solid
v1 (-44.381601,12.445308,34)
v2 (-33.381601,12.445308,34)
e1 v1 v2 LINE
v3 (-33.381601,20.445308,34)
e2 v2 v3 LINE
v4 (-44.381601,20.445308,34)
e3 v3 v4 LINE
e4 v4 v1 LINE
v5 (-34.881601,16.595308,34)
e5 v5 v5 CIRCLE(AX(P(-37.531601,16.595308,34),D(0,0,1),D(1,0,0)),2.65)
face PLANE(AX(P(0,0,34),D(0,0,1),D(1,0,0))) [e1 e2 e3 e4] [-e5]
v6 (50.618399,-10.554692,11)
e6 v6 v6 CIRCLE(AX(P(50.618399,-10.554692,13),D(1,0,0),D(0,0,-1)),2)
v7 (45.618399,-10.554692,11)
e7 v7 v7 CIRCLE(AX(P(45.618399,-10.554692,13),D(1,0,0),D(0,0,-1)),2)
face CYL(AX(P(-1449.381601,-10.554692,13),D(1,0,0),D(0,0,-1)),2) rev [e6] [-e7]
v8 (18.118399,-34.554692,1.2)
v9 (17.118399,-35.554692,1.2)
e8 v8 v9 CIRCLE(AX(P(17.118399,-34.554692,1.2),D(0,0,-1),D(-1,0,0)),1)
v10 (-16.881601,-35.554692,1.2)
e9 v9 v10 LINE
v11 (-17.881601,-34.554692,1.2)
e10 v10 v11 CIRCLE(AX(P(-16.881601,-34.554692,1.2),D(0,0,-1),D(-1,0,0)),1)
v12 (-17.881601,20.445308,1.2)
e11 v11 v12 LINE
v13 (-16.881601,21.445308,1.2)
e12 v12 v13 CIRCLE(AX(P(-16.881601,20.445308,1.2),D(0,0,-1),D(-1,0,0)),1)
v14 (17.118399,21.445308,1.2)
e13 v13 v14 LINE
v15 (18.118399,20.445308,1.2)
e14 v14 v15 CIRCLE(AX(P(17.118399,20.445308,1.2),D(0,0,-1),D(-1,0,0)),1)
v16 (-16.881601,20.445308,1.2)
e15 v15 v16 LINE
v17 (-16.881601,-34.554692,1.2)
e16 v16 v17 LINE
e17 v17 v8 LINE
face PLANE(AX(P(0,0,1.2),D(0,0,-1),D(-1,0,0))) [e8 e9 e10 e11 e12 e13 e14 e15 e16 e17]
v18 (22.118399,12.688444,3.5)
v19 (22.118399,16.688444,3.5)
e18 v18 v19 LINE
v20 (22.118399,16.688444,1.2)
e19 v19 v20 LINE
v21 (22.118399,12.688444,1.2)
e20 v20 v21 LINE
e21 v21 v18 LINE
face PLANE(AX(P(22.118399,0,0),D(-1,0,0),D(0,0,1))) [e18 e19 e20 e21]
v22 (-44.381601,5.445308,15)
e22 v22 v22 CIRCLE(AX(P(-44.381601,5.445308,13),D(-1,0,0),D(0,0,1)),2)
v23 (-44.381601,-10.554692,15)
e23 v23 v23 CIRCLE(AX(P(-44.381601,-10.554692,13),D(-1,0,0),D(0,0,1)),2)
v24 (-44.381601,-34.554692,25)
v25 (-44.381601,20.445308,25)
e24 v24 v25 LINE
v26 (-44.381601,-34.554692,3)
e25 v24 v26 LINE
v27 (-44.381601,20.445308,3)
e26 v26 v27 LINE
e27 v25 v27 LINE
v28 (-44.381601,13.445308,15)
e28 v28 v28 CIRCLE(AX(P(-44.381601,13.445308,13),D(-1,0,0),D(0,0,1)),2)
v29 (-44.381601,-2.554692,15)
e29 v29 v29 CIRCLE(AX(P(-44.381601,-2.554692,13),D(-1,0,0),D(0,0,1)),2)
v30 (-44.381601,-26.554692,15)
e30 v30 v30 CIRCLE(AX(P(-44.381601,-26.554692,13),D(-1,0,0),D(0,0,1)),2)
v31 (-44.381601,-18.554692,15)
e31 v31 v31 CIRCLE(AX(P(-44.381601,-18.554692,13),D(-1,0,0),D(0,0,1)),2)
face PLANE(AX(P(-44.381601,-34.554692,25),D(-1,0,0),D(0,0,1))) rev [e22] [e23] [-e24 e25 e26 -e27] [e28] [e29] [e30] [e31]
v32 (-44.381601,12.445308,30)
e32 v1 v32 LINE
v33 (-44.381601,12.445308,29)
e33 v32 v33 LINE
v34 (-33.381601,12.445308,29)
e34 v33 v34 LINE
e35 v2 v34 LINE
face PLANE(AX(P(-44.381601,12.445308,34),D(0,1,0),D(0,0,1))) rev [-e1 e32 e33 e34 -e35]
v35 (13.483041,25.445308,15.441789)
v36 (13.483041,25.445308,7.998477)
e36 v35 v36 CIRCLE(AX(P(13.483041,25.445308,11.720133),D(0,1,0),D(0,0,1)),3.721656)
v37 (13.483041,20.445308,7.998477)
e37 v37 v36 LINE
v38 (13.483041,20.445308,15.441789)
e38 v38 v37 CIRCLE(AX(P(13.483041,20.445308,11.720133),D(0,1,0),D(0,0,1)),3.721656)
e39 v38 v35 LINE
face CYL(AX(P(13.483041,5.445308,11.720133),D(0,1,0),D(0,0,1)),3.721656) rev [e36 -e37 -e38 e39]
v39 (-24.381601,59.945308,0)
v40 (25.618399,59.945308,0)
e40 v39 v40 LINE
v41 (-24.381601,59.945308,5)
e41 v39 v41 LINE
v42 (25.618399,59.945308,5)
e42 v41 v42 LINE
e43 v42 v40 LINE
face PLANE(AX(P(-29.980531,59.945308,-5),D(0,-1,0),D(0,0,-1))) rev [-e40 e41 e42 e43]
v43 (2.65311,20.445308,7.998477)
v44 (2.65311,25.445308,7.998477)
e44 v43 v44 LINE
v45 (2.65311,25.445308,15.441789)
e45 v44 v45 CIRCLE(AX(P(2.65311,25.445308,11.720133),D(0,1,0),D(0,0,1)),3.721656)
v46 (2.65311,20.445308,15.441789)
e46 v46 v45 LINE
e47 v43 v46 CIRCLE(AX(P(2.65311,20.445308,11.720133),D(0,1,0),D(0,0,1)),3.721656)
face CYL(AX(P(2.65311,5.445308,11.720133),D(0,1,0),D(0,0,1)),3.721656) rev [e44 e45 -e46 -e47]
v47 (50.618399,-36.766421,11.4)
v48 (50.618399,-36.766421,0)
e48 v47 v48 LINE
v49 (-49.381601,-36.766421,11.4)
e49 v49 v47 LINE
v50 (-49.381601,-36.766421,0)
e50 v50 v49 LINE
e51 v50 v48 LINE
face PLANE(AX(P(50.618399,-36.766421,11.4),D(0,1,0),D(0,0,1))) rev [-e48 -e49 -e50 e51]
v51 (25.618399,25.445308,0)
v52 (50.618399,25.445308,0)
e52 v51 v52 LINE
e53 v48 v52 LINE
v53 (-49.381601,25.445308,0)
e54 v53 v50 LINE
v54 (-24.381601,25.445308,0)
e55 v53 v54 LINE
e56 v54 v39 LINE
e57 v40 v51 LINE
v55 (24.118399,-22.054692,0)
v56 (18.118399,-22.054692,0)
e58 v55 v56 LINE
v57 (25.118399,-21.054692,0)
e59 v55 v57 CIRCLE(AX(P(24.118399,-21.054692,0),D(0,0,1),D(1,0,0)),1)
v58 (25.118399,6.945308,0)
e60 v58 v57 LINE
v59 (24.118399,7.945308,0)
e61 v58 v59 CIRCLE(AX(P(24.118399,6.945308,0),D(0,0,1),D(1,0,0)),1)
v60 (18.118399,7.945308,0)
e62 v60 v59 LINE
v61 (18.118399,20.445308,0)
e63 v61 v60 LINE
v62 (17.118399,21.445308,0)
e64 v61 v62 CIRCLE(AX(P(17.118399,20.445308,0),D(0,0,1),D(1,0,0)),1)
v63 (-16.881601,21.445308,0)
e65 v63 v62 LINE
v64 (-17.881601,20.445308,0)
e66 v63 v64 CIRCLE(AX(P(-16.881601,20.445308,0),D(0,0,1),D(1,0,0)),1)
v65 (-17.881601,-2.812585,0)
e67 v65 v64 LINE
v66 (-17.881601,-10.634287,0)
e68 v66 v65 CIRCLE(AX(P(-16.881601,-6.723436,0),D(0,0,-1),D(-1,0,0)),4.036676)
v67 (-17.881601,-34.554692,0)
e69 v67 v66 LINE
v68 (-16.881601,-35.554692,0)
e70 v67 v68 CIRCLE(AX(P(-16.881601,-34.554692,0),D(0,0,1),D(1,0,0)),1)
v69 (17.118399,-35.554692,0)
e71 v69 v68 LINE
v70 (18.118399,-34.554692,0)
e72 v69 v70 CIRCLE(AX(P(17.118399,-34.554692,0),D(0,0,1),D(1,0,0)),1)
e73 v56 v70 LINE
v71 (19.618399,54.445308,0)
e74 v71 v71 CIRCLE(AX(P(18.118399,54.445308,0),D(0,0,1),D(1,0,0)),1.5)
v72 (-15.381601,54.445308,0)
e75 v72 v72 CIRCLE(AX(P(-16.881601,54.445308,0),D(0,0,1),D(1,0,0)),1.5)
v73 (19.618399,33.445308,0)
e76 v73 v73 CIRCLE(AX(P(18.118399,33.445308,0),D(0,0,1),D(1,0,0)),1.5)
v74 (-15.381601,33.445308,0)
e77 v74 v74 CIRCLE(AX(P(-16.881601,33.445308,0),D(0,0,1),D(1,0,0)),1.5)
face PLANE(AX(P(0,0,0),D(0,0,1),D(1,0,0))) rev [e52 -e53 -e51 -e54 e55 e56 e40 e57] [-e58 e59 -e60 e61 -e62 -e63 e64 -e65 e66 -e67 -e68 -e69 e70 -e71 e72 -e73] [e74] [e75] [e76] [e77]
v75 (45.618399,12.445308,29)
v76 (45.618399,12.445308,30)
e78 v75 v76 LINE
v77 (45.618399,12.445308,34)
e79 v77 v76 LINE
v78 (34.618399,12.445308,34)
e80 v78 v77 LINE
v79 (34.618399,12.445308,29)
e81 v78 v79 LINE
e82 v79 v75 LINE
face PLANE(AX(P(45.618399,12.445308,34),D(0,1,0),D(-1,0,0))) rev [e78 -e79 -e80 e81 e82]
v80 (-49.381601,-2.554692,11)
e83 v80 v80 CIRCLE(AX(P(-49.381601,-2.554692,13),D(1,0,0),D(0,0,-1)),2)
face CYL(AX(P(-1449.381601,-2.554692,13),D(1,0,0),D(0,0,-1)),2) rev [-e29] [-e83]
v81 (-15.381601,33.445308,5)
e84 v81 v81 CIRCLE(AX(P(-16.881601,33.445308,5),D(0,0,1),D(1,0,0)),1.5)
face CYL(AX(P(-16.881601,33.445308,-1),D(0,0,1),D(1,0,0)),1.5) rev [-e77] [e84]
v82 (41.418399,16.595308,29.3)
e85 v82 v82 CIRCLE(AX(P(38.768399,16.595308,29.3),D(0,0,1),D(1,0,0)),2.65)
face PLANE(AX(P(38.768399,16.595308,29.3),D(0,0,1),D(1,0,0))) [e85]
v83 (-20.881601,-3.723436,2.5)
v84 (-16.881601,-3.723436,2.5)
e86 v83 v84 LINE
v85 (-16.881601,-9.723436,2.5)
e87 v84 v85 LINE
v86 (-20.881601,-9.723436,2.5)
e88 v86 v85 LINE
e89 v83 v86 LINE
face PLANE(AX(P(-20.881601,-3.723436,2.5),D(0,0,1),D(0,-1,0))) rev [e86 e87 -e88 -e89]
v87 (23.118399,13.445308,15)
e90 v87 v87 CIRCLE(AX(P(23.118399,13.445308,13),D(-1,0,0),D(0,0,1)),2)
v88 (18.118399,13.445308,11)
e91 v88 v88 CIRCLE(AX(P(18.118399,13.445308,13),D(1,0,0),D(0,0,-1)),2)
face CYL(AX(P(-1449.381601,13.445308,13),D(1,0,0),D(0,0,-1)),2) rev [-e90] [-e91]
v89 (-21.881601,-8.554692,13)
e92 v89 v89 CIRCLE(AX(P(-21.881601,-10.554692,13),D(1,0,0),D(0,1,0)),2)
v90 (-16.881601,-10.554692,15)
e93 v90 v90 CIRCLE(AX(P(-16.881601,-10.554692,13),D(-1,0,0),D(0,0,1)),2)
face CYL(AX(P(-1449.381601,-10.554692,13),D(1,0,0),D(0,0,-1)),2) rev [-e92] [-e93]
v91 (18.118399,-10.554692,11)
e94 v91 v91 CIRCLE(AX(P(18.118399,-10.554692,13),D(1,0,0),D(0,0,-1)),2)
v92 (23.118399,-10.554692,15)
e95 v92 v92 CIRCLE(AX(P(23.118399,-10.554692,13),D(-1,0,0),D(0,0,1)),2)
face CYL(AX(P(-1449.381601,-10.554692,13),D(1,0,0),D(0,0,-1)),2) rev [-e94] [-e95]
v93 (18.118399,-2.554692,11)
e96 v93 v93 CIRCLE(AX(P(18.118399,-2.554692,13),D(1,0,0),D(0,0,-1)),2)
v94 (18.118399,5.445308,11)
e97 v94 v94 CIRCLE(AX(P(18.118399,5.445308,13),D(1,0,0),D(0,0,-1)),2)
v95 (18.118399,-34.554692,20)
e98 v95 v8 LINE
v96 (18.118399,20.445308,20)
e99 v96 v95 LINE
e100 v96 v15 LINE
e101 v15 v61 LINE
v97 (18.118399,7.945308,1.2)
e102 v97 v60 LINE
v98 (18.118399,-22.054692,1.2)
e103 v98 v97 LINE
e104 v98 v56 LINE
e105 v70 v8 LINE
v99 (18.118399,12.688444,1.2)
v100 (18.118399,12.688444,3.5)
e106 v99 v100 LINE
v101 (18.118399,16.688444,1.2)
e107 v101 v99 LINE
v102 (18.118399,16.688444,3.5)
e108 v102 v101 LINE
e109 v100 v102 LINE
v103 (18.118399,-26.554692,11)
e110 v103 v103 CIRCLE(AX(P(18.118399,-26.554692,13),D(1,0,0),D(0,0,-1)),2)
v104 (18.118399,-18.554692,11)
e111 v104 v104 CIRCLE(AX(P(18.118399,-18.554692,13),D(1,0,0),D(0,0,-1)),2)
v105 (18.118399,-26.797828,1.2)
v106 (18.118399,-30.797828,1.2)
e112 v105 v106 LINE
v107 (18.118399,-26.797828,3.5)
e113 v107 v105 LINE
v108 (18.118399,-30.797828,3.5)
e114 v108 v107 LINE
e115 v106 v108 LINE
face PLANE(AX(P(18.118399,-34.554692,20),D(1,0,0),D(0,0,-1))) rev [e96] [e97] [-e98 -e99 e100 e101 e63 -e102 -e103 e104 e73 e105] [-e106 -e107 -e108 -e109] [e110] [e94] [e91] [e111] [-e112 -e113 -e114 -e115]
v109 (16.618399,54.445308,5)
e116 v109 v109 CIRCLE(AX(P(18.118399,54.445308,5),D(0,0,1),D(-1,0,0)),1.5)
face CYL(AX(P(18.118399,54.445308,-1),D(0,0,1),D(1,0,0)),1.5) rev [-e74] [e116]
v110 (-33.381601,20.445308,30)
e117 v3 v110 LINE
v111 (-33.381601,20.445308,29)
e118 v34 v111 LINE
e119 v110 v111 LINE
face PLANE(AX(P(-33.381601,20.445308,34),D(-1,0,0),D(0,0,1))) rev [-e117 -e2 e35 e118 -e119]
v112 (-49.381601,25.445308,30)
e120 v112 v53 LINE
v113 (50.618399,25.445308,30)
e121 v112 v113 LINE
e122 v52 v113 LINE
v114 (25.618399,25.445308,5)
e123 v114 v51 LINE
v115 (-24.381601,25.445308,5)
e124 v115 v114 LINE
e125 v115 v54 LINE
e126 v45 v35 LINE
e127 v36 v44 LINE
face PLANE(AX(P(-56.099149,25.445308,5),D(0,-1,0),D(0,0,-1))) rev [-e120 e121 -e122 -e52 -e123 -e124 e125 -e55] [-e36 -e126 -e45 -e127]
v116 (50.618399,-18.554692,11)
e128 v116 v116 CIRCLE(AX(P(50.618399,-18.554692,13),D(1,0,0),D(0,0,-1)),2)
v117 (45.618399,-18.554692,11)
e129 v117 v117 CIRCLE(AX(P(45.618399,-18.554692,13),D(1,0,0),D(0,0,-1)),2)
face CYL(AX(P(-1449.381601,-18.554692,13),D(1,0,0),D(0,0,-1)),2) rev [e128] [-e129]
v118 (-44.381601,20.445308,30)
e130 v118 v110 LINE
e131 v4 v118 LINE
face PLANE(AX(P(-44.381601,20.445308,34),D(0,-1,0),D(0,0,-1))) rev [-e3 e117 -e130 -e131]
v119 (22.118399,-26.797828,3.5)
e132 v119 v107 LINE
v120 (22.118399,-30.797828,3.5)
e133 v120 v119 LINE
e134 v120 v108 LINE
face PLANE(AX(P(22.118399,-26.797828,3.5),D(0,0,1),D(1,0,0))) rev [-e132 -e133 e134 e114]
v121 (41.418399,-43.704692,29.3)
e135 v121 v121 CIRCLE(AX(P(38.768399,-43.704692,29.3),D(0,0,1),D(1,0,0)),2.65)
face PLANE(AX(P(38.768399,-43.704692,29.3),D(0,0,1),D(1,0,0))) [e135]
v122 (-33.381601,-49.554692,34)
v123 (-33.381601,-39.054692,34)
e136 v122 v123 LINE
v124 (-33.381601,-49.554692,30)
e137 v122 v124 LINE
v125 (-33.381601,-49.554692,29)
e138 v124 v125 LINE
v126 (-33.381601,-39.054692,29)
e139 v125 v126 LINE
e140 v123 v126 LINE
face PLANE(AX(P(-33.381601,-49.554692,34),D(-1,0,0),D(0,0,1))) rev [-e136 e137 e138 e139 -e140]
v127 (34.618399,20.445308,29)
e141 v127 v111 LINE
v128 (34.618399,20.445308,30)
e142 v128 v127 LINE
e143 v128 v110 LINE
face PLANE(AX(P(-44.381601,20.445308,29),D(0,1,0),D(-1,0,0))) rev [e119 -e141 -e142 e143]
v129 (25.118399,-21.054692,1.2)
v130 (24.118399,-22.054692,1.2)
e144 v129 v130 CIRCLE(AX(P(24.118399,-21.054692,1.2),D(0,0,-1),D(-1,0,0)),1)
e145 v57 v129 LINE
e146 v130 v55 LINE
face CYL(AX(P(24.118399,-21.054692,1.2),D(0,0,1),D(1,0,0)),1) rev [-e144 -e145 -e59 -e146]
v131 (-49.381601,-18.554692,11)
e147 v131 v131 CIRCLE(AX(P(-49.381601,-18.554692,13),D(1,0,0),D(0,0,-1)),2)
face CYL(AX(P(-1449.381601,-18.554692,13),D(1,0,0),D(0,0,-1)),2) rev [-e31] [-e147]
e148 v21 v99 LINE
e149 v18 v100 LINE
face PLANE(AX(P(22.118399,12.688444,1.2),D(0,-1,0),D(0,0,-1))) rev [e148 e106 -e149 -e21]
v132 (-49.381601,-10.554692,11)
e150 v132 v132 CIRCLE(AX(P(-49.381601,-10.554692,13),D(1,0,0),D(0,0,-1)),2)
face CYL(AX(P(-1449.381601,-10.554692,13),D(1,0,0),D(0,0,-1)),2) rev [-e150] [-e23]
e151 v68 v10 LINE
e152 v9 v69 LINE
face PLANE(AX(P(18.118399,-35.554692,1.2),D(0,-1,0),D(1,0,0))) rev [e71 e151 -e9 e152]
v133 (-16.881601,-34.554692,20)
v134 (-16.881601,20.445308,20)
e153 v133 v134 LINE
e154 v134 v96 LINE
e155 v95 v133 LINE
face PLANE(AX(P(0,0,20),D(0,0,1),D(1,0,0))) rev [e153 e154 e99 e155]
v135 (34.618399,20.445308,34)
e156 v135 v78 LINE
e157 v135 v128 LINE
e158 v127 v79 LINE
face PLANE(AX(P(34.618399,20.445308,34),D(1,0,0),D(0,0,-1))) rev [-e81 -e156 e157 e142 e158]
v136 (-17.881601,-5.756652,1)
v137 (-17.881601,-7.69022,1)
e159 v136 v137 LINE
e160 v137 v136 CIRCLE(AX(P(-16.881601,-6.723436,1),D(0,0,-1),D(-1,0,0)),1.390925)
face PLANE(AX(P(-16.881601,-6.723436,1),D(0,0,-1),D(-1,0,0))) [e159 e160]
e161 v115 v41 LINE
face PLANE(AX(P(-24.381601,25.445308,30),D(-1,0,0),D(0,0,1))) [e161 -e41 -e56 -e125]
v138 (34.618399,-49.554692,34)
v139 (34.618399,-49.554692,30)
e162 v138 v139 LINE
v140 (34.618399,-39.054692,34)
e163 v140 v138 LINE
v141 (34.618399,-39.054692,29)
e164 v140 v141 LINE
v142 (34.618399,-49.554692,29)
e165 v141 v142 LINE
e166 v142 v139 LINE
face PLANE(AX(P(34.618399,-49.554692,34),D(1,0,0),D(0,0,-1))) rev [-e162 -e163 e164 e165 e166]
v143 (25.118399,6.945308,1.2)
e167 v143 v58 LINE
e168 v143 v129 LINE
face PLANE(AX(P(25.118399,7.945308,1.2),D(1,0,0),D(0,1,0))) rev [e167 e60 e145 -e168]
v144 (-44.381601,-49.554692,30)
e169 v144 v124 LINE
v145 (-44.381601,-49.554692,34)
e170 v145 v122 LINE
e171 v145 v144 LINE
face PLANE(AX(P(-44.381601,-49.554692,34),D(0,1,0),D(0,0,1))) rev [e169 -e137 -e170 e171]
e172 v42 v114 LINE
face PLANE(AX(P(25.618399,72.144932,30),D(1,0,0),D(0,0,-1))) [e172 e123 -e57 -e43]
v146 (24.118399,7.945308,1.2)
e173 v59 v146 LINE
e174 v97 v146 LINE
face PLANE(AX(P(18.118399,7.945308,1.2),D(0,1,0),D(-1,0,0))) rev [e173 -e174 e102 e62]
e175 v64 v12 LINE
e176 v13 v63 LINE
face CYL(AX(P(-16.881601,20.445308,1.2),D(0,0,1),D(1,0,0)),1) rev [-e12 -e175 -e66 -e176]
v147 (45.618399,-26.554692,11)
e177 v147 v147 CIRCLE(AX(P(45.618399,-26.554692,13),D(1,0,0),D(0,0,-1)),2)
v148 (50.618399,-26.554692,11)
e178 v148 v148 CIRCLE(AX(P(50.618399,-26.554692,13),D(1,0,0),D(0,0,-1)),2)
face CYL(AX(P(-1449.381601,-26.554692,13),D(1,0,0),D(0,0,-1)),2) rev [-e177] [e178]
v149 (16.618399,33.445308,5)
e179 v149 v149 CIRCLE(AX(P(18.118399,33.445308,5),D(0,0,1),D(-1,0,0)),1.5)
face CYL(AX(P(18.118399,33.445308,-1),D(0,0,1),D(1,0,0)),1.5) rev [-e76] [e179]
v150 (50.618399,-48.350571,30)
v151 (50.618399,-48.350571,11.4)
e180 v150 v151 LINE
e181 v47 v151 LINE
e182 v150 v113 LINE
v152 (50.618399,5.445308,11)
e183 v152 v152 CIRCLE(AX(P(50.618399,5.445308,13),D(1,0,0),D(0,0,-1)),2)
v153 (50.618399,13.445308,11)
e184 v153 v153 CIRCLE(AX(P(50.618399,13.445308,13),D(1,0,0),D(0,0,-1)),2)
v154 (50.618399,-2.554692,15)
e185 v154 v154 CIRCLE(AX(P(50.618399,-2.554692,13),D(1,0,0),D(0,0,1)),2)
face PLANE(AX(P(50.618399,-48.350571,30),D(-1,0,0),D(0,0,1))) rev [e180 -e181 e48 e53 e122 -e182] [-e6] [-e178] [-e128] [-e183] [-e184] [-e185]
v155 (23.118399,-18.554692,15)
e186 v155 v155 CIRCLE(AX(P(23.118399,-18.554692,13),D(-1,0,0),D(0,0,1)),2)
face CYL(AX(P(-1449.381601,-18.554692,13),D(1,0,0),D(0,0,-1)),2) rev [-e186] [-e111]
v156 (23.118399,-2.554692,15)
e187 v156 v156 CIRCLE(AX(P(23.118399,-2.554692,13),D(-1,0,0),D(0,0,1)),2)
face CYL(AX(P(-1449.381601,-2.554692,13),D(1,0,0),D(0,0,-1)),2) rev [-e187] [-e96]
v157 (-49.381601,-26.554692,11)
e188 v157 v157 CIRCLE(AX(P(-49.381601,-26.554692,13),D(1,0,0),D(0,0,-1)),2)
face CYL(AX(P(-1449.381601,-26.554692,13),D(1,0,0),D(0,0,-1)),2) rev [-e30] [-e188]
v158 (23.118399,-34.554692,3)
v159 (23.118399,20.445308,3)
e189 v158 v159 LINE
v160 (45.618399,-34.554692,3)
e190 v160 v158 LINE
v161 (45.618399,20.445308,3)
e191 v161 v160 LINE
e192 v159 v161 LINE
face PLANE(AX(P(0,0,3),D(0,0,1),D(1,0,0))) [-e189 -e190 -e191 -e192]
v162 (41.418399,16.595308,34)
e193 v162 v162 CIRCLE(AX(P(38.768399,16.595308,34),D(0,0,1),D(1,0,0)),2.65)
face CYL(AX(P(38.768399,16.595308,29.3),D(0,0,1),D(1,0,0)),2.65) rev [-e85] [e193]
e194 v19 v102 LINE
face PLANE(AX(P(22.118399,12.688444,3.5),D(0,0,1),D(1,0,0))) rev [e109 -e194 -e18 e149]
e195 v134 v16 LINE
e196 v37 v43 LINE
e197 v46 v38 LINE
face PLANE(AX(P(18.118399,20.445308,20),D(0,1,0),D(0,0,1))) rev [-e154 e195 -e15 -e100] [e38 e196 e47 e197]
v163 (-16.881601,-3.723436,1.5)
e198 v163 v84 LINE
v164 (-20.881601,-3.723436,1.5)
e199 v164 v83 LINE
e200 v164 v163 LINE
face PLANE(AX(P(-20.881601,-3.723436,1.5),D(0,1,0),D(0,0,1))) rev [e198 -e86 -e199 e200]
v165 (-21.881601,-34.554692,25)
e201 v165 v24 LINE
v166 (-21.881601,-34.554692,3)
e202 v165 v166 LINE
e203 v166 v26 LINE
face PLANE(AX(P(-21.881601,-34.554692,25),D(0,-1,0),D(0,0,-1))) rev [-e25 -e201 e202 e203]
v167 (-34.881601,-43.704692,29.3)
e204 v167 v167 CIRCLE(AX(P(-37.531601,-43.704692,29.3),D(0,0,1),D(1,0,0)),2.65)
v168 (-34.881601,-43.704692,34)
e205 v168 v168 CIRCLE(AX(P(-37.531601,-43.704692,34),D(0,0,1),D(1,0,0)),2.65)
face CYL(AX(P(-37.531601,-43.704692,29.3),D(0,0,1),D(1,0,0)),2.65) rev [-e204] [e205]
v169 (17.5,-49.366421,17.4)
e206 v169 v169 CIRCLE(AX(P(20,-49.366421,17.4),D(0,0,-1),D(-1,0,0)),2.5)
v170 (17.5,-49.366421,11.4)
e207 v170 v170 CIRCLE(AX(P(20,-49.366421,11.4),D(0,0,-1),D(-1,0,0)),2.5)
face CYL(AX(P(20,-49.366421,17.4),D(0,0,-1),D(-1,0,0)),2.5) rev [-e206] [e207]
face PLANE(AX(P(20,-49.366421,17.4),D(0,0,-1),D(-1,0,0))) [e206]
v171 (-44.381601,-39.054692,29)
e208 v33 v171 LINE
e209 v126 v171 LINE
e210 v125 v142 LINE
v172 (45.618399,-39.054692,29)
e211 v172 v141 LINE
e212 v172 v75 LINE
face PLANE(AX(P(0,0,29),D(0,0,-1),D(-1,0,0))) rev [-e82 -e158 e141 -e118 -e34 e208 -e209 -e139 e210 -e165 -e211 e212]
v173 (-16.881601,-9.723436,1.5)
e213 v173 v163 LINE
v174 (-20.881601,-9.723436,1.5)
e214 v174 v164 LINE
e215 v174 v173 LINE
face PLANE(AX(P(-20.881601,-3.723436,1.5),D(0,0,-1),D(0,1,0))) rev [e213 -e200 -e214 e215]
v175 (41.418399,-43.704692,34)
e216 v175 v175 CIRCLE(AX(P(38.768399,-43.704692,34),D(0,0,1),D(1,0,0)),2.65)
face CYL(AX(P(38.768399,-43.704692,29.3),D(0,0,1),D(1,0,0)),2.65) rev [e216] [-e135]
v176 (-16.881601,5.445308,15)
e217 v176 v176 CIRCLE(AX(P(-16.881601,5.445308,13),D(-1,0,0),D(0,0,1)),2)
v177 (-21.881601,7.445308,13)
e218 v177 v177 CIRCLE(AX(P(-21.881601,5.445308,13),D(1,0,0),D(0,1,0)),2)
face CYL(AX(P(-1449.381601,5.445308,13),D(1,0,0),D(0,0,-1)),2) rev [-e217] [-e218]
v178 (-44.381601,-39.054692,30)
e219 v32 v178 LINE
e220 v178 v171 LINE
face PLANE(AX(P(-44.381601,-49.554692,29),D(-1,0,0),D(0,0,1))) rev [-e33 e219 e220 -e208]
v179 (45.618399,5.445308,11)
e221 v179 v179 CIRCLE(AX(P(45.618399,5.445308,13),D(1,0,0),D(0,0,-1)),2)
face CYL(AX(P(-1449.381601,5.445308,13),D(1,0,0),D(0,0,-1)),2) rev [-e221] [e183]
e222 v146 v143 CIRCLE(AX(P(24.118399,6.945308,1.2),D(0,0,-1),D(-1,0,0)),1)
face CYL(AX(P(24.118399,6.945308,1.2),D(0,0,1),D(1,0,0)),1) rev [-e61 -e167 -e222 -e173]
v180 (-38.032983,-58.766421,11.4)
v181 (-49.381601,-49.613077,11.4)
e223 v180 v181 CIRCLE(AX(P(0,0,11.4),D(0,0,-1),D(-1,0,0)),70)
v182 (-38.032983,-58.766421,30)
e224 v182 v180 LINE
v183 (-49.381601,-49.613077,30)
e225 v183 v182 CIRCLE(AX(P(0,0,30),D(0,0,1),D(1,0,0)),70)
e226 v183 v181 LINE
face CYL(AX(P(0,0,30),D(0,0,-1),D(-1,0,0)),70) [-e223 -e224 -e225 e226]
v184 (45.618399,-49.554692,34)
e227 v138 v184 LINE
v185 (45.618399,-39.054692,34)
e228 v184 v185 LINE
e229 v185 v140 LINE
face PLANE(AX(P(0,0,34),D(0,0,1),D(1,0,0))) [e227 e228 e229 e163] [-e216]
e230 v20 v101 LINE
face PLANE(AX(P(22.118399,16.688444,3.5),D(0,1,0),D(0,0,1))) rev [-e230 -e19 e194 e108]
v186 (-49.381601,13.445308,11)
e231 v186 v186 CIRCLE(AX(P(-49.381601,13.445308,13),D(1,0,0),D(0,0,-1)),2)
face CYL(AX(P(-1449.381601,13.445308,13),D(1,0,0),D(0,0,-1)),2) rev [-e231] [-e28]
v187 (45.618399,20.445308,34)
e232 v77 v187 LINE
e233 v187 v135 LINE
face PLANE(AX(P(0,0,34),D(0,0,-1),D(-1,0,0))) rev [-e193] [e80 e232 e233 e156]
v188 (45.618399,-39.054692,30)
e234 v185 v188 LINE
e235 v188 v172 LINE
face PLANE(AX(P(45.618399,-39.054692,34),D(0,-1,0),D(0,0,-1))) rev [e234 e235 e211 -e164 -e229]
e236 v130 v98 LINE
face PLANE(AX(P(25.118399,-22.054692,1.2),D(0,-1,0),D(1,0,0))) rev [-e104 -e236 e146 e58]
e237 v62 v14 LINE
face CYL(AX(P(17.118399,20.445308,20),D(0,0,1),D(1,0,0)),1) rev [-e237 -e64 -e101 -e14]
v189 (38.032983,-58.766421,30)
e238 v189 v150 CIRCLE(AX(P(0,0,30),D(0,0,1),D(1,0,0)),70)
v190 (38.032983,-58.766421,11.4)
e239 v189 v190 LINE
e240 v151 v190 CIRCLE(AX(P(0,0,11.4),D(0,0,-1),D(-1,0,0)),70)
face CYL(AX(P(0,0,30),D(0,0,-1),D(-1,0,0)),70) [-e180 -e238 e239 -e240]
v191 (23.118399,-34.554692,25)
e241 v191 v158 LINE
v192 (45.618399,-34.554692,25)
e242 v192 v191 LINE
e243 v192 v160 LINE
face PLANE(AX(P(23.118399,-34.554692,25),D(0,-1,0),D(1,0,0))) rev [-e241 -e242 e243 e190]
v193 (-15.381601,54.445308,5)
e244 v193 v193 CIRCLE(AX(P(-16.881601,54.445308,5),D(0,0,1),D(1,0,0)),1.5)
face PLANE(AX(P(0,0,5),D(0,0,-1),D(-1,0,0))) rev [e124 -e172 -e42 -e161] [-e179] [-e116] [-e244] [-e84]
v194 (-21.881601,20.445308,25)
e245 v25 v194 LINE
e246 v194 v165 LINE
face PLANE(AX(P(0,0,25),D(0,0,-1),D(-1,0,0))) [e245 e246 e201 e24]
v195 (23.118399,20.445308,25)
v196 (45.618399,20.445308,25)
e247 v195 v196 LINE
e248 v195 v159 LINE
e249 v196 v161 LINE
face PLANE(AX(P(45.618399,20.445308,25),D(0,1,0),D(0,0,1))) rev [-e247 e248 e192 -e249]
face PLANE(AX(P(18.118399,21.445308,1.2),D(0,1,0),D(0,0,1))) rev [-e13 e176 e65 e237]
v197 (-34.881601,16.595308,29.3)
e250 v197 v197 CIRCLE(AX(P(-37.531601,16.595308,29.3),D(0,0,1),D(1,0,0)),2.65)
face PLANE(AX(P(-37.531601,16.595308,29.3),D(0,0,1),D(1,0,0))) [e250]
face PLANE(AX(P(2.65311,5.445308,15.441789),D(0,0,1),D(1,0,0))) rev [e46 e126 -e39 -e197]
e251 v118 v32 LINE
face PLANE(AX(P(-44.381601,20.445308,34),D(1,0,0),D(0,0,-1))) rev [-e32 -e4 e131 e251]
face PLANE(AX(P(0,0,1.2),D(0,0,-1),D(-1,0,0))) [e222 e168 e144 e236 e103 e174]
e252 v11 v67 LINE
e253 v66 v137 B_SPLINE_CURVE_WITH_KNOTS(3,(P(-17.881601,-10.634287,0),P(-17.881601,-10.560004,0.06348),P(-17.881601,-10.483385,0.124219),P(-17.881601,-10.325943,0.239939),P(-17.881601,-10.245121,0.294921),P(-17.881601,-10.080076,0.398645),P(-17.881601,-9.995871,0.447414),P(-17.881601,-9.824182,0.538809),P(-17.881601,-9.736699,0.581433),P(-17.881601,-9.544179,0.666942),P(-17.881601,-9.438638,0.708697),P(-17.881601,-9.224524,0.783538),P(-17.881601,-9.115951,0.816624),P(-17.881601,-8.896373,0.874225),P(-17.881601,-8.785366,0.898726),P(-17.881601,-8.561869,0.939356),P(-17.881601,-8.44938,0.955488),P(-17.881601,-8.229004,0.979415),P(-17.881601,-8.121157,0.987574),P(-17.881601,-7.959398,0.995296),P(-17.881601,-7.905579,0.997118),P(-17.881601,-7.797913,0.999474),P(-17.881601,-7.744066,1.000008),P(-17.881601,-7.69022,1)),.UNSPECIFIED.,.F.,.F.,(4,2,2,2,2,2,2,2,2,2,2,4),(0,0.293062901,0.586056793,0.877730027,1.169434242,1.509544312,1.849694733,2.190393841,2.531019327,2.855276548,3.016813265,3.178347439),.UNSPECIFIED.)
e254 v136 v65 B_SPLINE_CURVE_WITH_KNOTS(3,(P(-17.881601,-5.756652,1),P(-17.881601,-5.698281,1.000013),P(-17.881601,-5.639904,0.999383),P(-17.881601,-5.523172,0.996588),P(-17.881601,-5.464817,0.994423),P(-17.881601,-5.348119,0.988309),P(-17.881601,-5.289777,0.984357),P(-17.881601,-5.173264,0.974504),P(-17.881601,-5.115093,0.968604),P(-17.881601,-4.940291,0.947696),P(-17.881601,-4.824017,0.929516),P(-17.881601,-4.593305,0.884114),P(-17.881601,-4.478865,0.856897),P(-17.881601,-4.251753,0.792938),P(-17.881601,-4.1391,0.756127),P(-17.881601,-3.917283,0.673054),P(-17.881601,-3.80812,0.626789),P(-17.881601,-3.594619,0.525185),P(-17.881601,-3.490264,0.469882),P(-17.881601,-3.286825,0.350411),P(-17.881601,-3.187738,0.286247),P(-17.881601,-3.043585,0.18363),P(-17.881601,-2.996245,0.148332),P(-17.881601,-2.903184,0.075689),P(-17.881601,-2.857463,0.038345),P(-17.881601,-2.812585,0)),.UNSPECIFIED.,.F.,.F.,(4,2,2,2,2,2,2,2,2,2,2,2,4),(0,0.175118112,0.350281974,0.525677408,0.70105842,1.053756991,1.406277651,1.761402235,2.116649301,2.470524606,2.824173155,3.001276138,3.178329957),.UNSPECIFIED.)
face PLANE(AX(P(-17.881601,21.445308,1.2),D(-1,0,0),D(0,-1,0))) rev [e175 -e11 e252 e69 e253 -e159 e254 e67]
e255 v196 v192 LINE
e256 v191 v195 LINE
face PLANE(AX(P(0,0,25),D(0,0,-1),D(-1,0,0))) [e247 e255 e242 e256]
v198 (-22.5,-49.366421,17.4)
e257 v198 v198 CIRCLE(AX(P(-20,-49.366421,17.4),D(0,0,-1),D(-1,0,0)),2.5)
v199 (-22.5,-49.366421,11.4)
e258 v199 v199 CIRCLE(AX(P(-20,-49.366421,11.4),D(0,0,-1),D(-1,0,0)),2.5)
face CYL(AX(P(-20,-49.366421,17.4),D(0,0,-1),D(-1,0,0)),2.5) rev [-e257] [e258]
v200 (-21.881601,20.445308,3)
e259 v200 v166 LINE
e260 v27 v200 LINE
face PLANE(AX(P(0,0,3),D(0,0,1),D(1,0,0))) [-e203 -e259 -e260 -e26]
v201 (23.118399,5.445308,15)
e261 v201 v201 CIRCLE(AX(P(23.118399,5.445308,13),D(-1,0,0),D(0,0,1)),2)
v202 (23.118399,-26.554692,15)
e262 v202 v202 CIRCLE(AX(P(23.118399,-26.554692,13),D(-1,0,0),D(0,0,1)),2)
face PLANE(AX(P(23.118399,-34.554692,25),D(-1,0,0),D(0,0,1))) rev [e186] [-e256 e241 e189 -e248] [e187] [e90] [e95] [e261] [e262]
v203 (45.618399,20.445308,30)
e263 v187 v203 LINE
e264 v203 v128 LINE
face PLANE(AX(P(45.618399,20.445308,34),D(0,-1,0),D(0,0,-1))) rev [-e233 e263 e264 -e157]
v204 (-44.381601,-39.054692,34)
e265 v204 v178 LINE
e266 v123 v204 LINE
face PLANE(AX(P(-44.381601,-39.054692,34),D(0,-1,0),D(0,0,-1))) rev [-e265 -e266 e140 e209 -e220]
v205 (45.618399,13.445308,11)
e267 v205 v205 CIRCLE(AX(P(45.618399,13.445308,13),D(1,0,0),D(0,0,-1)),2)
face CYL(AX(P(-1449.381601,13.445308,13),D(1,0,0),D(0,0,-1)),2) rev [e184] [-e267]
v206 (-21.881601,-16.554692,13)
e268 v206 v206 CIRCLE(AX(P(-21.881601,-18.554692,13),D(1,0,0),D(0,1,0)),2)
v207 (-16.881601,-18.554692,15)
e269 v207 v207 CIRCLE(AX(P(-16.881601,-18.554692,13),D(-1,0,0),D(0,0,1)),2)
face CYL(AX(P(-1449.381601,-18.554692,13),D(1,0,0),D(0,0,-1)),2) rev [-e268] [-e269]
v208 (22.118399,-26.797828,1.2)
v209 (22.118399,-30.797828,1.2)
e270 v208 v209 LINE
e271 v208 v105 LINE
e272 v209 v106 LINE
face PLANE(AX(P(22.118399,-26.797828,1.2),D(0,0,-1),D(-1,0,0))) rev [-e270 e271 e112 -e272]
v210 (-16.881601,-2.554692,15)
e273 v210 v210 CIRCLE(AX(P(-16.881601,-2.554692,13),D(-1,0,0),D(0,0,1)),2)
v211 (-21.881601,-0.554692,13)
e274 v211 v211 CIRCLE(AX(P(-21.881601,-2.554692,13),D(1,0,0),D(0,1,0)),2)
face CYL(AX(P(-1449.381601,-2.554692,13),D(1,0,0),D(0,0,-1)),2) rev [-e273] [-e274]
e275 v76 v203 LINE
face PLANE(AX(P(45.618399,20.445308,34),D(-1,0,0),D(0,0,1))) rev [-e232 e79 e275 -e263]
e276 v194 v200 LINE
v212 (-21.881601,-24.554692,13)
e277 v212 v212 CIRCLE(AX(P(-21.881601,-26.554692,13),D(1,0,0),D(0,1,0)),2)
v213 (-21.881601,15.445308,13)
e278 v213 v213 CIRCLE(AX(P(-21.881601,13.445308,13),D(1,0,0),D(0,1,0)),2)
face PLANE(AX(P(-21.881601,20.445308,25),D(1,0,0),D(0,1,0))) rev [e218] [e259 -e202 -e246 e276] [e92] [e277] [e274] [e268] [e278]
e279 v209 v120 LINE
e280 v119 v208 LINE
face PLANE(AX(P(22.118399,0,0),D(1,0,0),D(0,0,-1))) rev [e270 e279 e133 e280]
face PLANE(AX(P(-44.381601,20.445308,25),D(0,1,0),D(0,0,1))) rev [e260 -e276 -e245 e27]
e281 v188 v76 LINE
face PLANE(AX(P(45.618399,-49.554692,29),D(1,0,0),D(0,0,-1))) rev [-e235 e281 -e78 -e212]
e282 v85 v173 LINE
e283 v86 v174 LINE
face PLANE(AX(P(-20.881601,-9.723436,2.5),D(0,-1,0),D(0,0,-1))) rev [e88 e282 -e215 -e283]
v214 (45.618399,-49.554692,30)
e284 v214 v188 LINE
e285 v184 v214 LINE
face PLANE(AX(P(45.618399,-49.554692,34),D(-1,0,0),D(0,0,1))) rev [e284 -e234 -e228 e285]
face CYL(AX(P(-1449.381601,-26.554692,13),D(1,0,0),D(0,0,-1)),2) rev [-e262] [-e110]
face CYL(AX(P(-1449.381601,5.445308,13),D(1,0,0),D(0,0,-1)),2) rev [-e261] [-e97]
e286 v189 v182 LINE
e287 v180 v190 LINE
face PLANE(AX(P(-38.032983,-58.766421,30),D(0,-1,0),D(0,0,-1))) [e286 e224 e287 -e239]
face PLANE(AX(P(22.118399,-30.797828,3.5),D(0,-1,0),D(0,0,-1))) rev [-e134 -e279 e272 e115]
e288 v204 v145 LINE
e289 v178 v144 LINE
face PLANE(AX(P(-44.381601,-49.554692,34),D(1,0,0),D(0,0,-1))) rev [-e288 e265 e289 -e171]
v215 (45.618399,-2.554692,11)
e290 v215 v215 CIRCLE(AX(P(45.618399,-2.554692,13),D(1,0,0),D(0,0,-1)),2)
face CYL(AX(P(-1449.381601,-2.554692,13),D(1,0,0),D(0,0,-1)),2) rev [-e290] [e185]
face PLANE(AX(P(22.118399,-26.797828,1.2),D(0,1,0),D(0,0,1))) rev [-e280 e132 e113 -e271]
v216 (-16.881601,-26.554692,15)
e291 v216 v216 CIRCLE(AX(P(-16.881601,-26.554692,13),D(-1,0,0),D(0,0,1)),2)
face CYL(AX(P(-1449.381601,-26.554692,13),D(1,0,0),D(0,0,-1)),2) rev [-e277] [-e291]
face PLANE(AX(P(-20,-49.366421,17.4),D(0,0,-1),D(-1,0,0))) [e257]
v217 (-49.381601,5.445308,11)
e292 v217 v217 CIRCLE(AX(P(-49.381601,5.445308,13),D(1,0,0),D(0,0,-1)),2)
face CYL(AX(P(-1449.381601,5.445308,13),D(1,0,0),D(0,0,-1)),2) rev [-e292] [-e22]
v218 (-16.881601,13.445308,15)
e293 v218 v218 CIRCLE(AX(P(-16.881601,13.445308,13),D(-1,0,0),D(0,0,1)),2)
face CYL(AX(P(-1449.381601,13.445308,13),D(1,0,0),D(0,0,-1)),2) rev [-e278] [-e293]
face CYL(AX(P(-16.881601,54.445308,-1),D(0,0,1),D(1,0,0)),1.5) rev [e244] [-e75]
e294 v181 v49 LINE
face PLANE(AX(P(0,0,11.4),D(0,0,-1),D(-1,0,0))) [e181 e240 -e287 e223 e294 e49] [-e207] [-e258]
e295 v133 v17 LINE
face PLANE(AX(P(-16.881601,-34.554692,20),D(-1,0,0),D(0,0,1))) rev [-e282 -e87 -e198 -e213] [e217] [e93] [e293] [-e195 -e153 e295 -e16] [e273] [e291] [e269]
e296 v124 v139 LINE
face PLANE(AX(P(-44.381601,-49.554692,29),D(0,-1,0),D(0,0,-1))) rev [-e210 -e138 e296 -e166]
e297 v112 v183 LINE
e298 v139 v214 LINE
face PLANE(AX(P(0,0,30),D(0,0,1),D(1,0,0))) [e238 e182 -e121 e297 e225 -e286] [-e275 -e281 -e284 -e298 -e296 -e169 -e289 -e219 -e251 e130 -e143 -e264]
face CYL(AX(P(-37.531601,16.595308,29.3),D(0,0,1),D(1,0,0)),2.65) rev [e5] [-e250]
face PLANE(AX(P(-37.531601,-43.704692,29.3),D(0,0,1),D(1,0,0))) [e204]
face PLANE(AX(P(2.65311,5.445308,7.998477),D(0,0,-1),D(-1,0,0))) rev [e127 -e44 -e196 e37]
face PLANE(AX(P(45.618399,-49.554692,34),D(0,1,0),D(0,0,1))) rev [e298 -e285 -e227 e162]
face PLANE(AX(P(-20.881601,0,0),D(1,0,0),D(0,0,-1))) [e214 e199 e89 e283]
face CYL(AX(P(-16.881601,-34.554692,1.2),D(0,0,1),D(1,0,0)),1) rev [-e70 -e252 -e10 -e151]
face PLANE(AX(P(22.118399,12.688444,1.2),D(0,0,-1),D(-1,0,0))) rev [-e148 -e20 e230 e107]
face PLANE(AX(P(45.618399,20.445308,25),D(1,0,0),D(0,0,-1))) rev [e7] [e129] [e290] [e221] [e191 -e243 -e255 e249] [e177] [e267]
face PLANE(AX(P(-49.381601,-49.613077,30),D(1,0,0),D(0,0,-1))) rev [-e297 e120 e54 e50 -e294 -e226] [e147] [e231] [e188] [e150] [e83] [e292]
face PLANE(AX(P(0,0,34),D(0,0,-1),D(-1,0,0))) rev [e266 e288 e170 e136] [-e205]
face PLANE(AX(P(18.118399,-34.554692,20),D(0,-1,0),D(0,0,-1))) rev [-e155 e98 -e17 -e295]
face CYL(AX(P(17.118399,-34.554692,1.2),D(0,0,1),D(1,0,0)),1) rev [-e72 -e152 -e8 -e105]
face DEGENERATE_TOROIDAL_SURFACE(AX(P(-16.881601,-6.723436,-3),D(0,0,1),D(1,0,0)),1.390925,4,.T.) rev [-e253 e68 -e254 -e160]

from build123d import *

# Parameters (mm, degrees)
RESSALTO_EXTRUS_O1_DEPTH   = 30
ESBO_O10_W                 = 112.198297798
ESBO_O10_H                 = 48.296192569
CORTE_EXTRUS_O6_DEPTH      = 25
CORTE_EXTRUS_O7_DEPTH      = 90.92898472
CORTE_EXTRUS_O7_DEPTH_BACK = 90.92898472
ESBO_O12_W                 = 36.72404194
ESBO_O12_H                 = 46.699624219
ESBO_O12_W_2               = 36.523308256
ESBO_O12_W_3               = 76.065965206
ESBO_O12_H_2               = 16.622456002
ESBO_O13_W                 = 35
ESBO_O13_H                 = 55
CORTE_EXTRUS_O8_DEPTH      = 20
CORTE_EXTRUS_O9_DEPTH      = 20
ESBO_O15_W                 = 90
ESBO_O15_H                 = 70
CORTE_EXTRUS_O10_DEPTH     = 1
ESBO_O16_W                 = 22.5
ESBO_O16_H                 = 55
CORTE_EXTRUS_O11_DEPTH     = 25
ESBO_O18_W                 = 90
ESBO_O18_H                 = 55
RESSALTO_EXTRUS_O2_DEPTH   = 3
ESBO_O19_W                 = 35
ESBO_O19_H                 = 55
CORTE_EXTRUS_O12_DEPTH     = 3
ESBO_O20_R                 = 2
CORTE_EXTRUS_O13_DEPTH     = 1500
ESBO_O21_W                 = 105.588179738
ESBO_O21_H                 = 28.353928622
CORTE_EXTRUS_O14_DEPTH     = 11.4
CORTE_EXTRUS_O15_DEPTH     = 10
ESBO_O23_R                 = 1.5
CORTE_EXTRUS_O16_DEPTH     = 6
ESBO_O29_W                 = 7
ESBO_O29_H                 = 30
CORTE_EXTRUS_O18_DEPTH     = 1.2
ESBO_O31_W                 = 2.3
ESBO_O31_H                 = 4
CORTE_EXTRUS_O19_DEPTH     = 4
ESBO_O33_W                 = 1
ESBO_O33_H                 = 6
CORTE_EXTRUS_O20_DEPTH     = 4
ESBO_O34_R                 = 2.5
CORTE_EXTRUS_O21_DEPTH     = 6
ESBO_O35_W                 = 11
ESBO_O35_H                 = 8
ESBO_O35_H_2               = 10.5
RESSALTO_EXTRUS_O3_DEPTH   = 5
ESBO_O36_R                 = 2.65
CORTE_EXTRUS_O22_DEPTH     = 4.7
ESBO_O38_W                 = 36
ESBO_O38_H                 = 57
CORTE_EXTRUS_O23_DEPTH     = 1.2
FILETE4_R                  = 1
FILETE5_R                  = 1
FILETE6_R                  = 1
ESBO_O40_R                 = 4.036676011
CORTE_EXTRUS_O25_DEPTH     = 1
FILETE9_R                  = 4


with BuildPart() as part:
    # Esboço1 → Ressalto-extrusão1 (new body)
    with BuildSketch(Plane.XY):
        with BuildLine():
            Line((-49.381601242, -49.613077498), (-49.381601242, 49.613077498))
            ThreePointArc((-49.381601242, 49.613077498), (0.883684189, 69.994421937), (50.618398758, 48.350570908))
            Line((50.618398758, 48.350570908), (50.618398758, -48.350570908))
            ThreePointArc((50.618398758, -48.350570908), (0.883684189, -69.994421937), (-49.381601242, -49.613077498))
        make_face()
    extrude(amount=RESSALTO_EXTRUS_O1_DEPTH)

    # Esboço10 → Corte-extrusão6 (cut)
    with BuildSketch(Plane.XY.offset(30)):
        with Locations((0, 49.593404353)):
            Rectangle(ESBO_O10_W, ESBO_O10_H)
    extrude(amount=-CORTE_EXTRUS_O6_DEPTH, mode=Mode.SUBTRACT)

    # Esboço12 → Corte-extrusão7 (cut, two sides: drawn at the far end of the back side and taken through both)
    with BuildSketch(Plane.XY.offset(5).offset(-CORTE_EXTRUS_O7_DEPTH_BACK)):
        with Locations((-42.743622212, 48.795120178)):
            Rectangle(ESBO_O12_W, ESBO_O12_H)
        with Locations((43.880052886, 48.795120178)):
            Rectangle(ESBO_O12_W_2, ESBO_O12_H)
        with Locations((0, -67.077648977)):
            Rectangle(ESBO_O12_W_3, ESBO_O12_H_2)
    extrude(amount=CORTE_EXTRUS_O7_DEPTH + CORTE_EXTRUS_O7_DEPTH_BACK, mode=Mode.SUBTRACT)

    # Esboço13 → Corte-extrusão8 (cut)
    with BuildSketch(Plane(origin=(0, 0, 0), x_dir=(-1, 0, 0), z_dir=(0, 0, -1))):
        with Locations((-0.618398758, -7.054691932)):
            Rectangle(ESBO_O13_W, ESBO_O13_H)
    extrude(amount=-CORTE_EXTRUS_O8_DEPTH, mode=Mode.SUBTRACT)

    # Esboço14 → Corte-extrusão9 (cut)
    with BuildSketch(Plane(origin=(0, 25.445308068, 0), x_dir=(1, 0, 0), z_dir=(0, 1, 0))):
        with BuildLine():
            Line((2.653109582, -7.998476533), (13.483040952, -7.998476533))
            ThreePointArc((13.483040952, -7.998476533), (17.204697231, -11.720132813), (13.483040952, -15.441789092))
            Line((13.483040952, -15.441789092), (2.653109582, -15.441789092))
            ThreePointArc((2.653109582, -15.441789092), (-1.068546697, -11.720132813), (2.653109582, -7.998476533))
        make_face()
    extrude(amount=-CORTE_EXTRUS_O9_DEPTH, mode=Mode.SUBTRACT)

    # Esboço15 → Corte-extrusão10 (cut)
    with BuildSketch(Plane.XY.offset(30)):
        with Locations((0.618398758, -14.554691932)):
            Rectangle(ESBO_O15_W, ESBO_O15_H)
    extrude(amount=-CORTE_EXTRUS_O10_DEPTH, mode=Mode.SUBTRACT)

    # Esboço16 → Corte-extrusão11 (cut)
    with BuildSketch(Plane(origin=(0, 0, 0), x_dir=(-1, 0, 0), z_dir=(0, 0, -1))):
        with Locations((-34.368398758, -7.054691932)):
            Rectangle(ESBO_O16_W, ESBO_O16_H)
        with Locations((33.131601242, -7.054691932)):
            Rectangle(ESBO_O16_W, ESBO_O16_H)
    extrude(amount=-CORTE_EXTRUS_O11_DEPTH, mode=Mode.SUBTRACT)

    # Esboço18 → Ressalto-extrusão2 (add)
    with BuildSketch(Plane(origin=(0, 0, 0), x_dir=(-1, 0, 0), z_dir=(0, 0, -1))):
        with Locations((-0.618398758, -7.054691932)):
            Rectangle(ESBO_O18_W, ESBO_O18_H)
    extrude(amount=-RESSALTO_EXTRUS_O2_DEPTH)

    # Esboço19 → Corte-extrusão12 (cut)
    with BuildSketch(Plane(origin=(0, 0, 0), x_dir=(-1, 0, 0), z_dir=(0, 0, -1))):
        with Locations((-0.618398758, -7.054691932)):
            Rectangle(ESBO_O19_W, ESBO_O19_H)
    extrude(amount=-CORTE_EXTRUS_O12_DEPTH, mode=Mode.SUBTRACT)

    # Esboço20 → Corte-extrusão13 (cut)
    with BuildSketch(Plane(origin=(50.618398758, 0, 0), x_dir=(0, 0, -1), z_dir=(1, 0, 0))):
        with Locations((-13, 5.445308068)):
            Circle(ESBO_O20_R)
        with Locations((-13, -2.554691932)):
            Circle(ESBO_O20_R)
        with Locations((-13, 13.445308068)):
            Circle(ESBO_O20_R)
        with Locations((-13, -10.554691932)):
            Circle(ESBO_O20_R)
        with Locations((-13, -18.554691932)):
            Circle(ESBO_O20_R)
        with Locations((-13, -26.554691932)):
            Circle(ESBO_O20_R)
    extrude(amount=-CORTE_EXTRUS_O13_DEPTH, mode=Mode.SUBTRACT)

    # Esboço21 → Corte-extrusão14 (cut)
    with BuildSketch(Plane(origin=(0, 0, 0), x_dir=(-1, 0, 0), z_dir=(0, 0, -1))):
        with Locations((2.175691111, -50.943385287)):
            Rectangle(ESBO_O21_W, ESBO_O21_H)
    extrude(amount=-CORTE_EXTRUS_O14_DEPTH, mode=Mode.SUBTRACT)

    # Esboço22 → Corte-extrusão15 (cut)
    with BuildSketch(Plane.XY.offset(5)):
        Polygon((-29.980530995, 70.945308068), (31.249974599, 70.942177058), (31.249974599, 59.945308068), (-29.980530995, 59.945308068), align=None)
    extrude(amount=-CORTE_EXTRUS_O15_DEPTH, mode=Mode.SUBTRACT)

    # Esboço23 → Corte-extrusão16 (cut)
    with BuildSketch(Plane.XY.offset(5)):
        with Locations((-16.881601242, 54.445308068)):
            Circle(ESBO_O23_R)
        with Locations((-16.881601242, 33.445308068)):
            Circle(ESBO_O23_R)
        with Locations((18.118398758, 33.445308068)):
            Circle(ESBO_O23_R)
        with Locations((18.118398758, 54.445308068)):
            Circle(ESBO_O23_R)
    extrude(amount=-CORTE_EXTRUS_O16_DEPTH, mode=Mode.SUBTRACT)

    # Esboço29 → Corte-extrusão18 (cut)
    with BuildSketch(Plane(origin=(0, 0, 0), x_dir=(-1, 0, 0), z_dir=(0, 0, -1))):
        with Locations((-21.618398758, -7.054691932)):
            Rectangle(ESBO_O29_W, ESBO_O29_H)
    extrude(amount=-CORTE_EXTRUS_O18_DEPTH, mode=Mode.SUBTRACT)

    # Esboço31 → Corte-extrusão19 (cut)
    with BuildSketch(Plane.ZY.offset(-18.118398758)):
        with Locations((2.35, 14.688444073)):
            Rectangle(ESBO_O31_W, ESBO_O31_H)
        with Locations((2.35, -28.797827937)):
            Rectangle(ESBO_O31_W, ESBO_O31_H)
    extrude(amount=-CORTE_EXTRUS_O19_DEPTH, mode=Mode.SUBTRACT)

    # Esboço33 → Corte-extrusão20 (cut)
    with BuildSketch(Plane(origin=(-16.881601242, 0, 0), x_dir=(0, 0, -1), z_dir=(1, 0, 0))):
        with Locations((-2, -6.723435912)):
            Rectangle(ESBO_O33_W, ESBO_O33_H)
    extrude(amount=-CORTE_EXTRUS_O20_DEPTH, mode=Mode.SUBTRACT)

    # Esboço34 → Corte-extrusão21 (cut)
    with BuildSketch(Plane(origin=(0, 0, 11.4), x_dir=(-1, 0, 0), z_dir=(0, 0, -1))):
        with Locations((20, -49.366420976)):
            Circle(ESBO_O34_R)
        with Locations((-20, -49.366420976)):
            Circle(ESBO_O34_R)
    extrude(amount=-CORTE_EXTRUS_O21_DEPTH, mode=Mode.SUBTRACT)

    # Esboço35 → Ressalto-extrusão3 (add)
    with BuildSketch(Plane.XY.offset(29)):
        with Locations((-38.881601242, 16.445308068)):
            Rectangle(ESBO_O35_W, ESBO_O35_H)
        with Locations((40.118398758, 16.445308068)):
            Rectangle(ESBO_O35_W, ESBO_O35_H)
        with Locations((40.118398758, -44.304691932)):
            Rectangle(ESBO_O35_W, ESBO_O35_H_2)
        with Locations((-38.881601242, -44.304691932)):
            Rectangle(ESBO_O35_W, ESBO_O35_H_2)
    extrude(amount=RESSALTO_EXTRUS_O3_DEPTH)

    # Esboço36 → Corte-extrusão22 (cut)
    with BuildSketch(Plane.XY.offset(34)):
        with Locations((-37.531601242, 16.595308068)):
            Circle(ESBO_O36_R)
        with Locations((38.768398758, 16.595308068)):
            Circle(ESBO_O36_R)
        with Locations((38.768398758, -43.704691932)):
            Circle(ESBO_O36_R)
        with Locations((-37.531601242, -43.704691932)):
            Circle(ESBO_O36_R)
    extrude(amount=-CORTE_EXTRUS_O22_DEPTH, mode=Mode.SUBTRACT)

    # Esboço38 → Corte-extrusão23 (cut)
    with BuildSketch(Plane(origin=(0, 0, 0), x_dir=(-1, 0, 0), z_dir=(0, 0, -1))):
        with Locations((-0.118398758, -7.054691932)):
            Rectangle(ESBO_O38_W, ESBO_O38_H)
    extrude(amount=-CORTE_EXTRUS_O23_DEPTH, mode=Mode.SUBTRACT)

    # Filete4
    filete4_edges = [part.edges().sort_by_distance(p)[0] for p in [
        (-17.881601242, 21.445308068, 0.6),
    ]]
    fillet(filete4_edges, radius=FILETE4_R)

    # Filete5
    filete5_edges = [part.edges().sort_by_distance(p)[0] for p in [
        (18.118398758, -35.554691932, 0.6),
        (-17.881601242, -35.554691932, 0.6),
        (18.118398758, 21.445308068, 0.6),
    ]]
    fillet(filete5_edges, radius=FILETE5_R)

    # Filete6
    filete6_edges = [part.edges().sort_by_distance(p)[0] for p in [
        (25.118398758, -22.054691932, 0.6),
        (25.118398758, 7.945308068, 0.6),
    ]]
    fillet(filete6_edges, radius=FILETE6_R)

    # Esboço40 → Corte-extrusão25 (cut)
    with BuildSketch(Plane(origin=(0, 0, 0), x_dir=(-1, 0, 0), z_dir=(0, 0, -1))):
        with Locations((16.881601242, -6.723435912)):
            Circle(ESBO_O40_R)
    extrude(amount=-CORTE_EXTRUS_O25_DEPTH, mode=Mode.SUBTRACT)

    # Filete9
    # the kernel refuses this fillet: 4 mm, written as the material it adds along each edge
    with BuildSketch(Plane(origin=(-16.881601242, -6.723435912, 1), x_dir=(0.9837182515450056, 0.17971756057001487, 0), z_dir=(0.17971756057001487, -0.9837182515450056, 0))) as filete9_piece_1_section:
        with BuildLine():
            CenterArc((1.3909247, -4), FILETE9_R, 48.590377891, 41.409622109)
            Line((1.3909247, 0), (1.3909247, 0.08))
            Line((1.3909247, 0.08), (4.036676011, 0.08))
            Line((4.036676011, 0.08), (4.116676011, 0))
            ThreePointArc((4.116676011, 0), (4.116676011, -0.5), (4.089591037, -0.94))
            Line((4.089591037, -0.94), (4.036676011, -1))
        make_face()
    filete9_piece_1 = revolve(axis=Axis((-16.881601242, -6.723435912, 1), (0, 0, 1)), revolution_arc=339.293382111, mode=Mode.PRIVATE)
    filete9_piece_1 = split(filete9_piece_1, bisect_by=Plane(origin=(-17.881601242, -6.723435912, 1), z_dir=(-1, 0, 0)), keep=Keep.TOP, mode=Mode.PRIVATE)
    add(filete9_piece_1)


solid = part.part
